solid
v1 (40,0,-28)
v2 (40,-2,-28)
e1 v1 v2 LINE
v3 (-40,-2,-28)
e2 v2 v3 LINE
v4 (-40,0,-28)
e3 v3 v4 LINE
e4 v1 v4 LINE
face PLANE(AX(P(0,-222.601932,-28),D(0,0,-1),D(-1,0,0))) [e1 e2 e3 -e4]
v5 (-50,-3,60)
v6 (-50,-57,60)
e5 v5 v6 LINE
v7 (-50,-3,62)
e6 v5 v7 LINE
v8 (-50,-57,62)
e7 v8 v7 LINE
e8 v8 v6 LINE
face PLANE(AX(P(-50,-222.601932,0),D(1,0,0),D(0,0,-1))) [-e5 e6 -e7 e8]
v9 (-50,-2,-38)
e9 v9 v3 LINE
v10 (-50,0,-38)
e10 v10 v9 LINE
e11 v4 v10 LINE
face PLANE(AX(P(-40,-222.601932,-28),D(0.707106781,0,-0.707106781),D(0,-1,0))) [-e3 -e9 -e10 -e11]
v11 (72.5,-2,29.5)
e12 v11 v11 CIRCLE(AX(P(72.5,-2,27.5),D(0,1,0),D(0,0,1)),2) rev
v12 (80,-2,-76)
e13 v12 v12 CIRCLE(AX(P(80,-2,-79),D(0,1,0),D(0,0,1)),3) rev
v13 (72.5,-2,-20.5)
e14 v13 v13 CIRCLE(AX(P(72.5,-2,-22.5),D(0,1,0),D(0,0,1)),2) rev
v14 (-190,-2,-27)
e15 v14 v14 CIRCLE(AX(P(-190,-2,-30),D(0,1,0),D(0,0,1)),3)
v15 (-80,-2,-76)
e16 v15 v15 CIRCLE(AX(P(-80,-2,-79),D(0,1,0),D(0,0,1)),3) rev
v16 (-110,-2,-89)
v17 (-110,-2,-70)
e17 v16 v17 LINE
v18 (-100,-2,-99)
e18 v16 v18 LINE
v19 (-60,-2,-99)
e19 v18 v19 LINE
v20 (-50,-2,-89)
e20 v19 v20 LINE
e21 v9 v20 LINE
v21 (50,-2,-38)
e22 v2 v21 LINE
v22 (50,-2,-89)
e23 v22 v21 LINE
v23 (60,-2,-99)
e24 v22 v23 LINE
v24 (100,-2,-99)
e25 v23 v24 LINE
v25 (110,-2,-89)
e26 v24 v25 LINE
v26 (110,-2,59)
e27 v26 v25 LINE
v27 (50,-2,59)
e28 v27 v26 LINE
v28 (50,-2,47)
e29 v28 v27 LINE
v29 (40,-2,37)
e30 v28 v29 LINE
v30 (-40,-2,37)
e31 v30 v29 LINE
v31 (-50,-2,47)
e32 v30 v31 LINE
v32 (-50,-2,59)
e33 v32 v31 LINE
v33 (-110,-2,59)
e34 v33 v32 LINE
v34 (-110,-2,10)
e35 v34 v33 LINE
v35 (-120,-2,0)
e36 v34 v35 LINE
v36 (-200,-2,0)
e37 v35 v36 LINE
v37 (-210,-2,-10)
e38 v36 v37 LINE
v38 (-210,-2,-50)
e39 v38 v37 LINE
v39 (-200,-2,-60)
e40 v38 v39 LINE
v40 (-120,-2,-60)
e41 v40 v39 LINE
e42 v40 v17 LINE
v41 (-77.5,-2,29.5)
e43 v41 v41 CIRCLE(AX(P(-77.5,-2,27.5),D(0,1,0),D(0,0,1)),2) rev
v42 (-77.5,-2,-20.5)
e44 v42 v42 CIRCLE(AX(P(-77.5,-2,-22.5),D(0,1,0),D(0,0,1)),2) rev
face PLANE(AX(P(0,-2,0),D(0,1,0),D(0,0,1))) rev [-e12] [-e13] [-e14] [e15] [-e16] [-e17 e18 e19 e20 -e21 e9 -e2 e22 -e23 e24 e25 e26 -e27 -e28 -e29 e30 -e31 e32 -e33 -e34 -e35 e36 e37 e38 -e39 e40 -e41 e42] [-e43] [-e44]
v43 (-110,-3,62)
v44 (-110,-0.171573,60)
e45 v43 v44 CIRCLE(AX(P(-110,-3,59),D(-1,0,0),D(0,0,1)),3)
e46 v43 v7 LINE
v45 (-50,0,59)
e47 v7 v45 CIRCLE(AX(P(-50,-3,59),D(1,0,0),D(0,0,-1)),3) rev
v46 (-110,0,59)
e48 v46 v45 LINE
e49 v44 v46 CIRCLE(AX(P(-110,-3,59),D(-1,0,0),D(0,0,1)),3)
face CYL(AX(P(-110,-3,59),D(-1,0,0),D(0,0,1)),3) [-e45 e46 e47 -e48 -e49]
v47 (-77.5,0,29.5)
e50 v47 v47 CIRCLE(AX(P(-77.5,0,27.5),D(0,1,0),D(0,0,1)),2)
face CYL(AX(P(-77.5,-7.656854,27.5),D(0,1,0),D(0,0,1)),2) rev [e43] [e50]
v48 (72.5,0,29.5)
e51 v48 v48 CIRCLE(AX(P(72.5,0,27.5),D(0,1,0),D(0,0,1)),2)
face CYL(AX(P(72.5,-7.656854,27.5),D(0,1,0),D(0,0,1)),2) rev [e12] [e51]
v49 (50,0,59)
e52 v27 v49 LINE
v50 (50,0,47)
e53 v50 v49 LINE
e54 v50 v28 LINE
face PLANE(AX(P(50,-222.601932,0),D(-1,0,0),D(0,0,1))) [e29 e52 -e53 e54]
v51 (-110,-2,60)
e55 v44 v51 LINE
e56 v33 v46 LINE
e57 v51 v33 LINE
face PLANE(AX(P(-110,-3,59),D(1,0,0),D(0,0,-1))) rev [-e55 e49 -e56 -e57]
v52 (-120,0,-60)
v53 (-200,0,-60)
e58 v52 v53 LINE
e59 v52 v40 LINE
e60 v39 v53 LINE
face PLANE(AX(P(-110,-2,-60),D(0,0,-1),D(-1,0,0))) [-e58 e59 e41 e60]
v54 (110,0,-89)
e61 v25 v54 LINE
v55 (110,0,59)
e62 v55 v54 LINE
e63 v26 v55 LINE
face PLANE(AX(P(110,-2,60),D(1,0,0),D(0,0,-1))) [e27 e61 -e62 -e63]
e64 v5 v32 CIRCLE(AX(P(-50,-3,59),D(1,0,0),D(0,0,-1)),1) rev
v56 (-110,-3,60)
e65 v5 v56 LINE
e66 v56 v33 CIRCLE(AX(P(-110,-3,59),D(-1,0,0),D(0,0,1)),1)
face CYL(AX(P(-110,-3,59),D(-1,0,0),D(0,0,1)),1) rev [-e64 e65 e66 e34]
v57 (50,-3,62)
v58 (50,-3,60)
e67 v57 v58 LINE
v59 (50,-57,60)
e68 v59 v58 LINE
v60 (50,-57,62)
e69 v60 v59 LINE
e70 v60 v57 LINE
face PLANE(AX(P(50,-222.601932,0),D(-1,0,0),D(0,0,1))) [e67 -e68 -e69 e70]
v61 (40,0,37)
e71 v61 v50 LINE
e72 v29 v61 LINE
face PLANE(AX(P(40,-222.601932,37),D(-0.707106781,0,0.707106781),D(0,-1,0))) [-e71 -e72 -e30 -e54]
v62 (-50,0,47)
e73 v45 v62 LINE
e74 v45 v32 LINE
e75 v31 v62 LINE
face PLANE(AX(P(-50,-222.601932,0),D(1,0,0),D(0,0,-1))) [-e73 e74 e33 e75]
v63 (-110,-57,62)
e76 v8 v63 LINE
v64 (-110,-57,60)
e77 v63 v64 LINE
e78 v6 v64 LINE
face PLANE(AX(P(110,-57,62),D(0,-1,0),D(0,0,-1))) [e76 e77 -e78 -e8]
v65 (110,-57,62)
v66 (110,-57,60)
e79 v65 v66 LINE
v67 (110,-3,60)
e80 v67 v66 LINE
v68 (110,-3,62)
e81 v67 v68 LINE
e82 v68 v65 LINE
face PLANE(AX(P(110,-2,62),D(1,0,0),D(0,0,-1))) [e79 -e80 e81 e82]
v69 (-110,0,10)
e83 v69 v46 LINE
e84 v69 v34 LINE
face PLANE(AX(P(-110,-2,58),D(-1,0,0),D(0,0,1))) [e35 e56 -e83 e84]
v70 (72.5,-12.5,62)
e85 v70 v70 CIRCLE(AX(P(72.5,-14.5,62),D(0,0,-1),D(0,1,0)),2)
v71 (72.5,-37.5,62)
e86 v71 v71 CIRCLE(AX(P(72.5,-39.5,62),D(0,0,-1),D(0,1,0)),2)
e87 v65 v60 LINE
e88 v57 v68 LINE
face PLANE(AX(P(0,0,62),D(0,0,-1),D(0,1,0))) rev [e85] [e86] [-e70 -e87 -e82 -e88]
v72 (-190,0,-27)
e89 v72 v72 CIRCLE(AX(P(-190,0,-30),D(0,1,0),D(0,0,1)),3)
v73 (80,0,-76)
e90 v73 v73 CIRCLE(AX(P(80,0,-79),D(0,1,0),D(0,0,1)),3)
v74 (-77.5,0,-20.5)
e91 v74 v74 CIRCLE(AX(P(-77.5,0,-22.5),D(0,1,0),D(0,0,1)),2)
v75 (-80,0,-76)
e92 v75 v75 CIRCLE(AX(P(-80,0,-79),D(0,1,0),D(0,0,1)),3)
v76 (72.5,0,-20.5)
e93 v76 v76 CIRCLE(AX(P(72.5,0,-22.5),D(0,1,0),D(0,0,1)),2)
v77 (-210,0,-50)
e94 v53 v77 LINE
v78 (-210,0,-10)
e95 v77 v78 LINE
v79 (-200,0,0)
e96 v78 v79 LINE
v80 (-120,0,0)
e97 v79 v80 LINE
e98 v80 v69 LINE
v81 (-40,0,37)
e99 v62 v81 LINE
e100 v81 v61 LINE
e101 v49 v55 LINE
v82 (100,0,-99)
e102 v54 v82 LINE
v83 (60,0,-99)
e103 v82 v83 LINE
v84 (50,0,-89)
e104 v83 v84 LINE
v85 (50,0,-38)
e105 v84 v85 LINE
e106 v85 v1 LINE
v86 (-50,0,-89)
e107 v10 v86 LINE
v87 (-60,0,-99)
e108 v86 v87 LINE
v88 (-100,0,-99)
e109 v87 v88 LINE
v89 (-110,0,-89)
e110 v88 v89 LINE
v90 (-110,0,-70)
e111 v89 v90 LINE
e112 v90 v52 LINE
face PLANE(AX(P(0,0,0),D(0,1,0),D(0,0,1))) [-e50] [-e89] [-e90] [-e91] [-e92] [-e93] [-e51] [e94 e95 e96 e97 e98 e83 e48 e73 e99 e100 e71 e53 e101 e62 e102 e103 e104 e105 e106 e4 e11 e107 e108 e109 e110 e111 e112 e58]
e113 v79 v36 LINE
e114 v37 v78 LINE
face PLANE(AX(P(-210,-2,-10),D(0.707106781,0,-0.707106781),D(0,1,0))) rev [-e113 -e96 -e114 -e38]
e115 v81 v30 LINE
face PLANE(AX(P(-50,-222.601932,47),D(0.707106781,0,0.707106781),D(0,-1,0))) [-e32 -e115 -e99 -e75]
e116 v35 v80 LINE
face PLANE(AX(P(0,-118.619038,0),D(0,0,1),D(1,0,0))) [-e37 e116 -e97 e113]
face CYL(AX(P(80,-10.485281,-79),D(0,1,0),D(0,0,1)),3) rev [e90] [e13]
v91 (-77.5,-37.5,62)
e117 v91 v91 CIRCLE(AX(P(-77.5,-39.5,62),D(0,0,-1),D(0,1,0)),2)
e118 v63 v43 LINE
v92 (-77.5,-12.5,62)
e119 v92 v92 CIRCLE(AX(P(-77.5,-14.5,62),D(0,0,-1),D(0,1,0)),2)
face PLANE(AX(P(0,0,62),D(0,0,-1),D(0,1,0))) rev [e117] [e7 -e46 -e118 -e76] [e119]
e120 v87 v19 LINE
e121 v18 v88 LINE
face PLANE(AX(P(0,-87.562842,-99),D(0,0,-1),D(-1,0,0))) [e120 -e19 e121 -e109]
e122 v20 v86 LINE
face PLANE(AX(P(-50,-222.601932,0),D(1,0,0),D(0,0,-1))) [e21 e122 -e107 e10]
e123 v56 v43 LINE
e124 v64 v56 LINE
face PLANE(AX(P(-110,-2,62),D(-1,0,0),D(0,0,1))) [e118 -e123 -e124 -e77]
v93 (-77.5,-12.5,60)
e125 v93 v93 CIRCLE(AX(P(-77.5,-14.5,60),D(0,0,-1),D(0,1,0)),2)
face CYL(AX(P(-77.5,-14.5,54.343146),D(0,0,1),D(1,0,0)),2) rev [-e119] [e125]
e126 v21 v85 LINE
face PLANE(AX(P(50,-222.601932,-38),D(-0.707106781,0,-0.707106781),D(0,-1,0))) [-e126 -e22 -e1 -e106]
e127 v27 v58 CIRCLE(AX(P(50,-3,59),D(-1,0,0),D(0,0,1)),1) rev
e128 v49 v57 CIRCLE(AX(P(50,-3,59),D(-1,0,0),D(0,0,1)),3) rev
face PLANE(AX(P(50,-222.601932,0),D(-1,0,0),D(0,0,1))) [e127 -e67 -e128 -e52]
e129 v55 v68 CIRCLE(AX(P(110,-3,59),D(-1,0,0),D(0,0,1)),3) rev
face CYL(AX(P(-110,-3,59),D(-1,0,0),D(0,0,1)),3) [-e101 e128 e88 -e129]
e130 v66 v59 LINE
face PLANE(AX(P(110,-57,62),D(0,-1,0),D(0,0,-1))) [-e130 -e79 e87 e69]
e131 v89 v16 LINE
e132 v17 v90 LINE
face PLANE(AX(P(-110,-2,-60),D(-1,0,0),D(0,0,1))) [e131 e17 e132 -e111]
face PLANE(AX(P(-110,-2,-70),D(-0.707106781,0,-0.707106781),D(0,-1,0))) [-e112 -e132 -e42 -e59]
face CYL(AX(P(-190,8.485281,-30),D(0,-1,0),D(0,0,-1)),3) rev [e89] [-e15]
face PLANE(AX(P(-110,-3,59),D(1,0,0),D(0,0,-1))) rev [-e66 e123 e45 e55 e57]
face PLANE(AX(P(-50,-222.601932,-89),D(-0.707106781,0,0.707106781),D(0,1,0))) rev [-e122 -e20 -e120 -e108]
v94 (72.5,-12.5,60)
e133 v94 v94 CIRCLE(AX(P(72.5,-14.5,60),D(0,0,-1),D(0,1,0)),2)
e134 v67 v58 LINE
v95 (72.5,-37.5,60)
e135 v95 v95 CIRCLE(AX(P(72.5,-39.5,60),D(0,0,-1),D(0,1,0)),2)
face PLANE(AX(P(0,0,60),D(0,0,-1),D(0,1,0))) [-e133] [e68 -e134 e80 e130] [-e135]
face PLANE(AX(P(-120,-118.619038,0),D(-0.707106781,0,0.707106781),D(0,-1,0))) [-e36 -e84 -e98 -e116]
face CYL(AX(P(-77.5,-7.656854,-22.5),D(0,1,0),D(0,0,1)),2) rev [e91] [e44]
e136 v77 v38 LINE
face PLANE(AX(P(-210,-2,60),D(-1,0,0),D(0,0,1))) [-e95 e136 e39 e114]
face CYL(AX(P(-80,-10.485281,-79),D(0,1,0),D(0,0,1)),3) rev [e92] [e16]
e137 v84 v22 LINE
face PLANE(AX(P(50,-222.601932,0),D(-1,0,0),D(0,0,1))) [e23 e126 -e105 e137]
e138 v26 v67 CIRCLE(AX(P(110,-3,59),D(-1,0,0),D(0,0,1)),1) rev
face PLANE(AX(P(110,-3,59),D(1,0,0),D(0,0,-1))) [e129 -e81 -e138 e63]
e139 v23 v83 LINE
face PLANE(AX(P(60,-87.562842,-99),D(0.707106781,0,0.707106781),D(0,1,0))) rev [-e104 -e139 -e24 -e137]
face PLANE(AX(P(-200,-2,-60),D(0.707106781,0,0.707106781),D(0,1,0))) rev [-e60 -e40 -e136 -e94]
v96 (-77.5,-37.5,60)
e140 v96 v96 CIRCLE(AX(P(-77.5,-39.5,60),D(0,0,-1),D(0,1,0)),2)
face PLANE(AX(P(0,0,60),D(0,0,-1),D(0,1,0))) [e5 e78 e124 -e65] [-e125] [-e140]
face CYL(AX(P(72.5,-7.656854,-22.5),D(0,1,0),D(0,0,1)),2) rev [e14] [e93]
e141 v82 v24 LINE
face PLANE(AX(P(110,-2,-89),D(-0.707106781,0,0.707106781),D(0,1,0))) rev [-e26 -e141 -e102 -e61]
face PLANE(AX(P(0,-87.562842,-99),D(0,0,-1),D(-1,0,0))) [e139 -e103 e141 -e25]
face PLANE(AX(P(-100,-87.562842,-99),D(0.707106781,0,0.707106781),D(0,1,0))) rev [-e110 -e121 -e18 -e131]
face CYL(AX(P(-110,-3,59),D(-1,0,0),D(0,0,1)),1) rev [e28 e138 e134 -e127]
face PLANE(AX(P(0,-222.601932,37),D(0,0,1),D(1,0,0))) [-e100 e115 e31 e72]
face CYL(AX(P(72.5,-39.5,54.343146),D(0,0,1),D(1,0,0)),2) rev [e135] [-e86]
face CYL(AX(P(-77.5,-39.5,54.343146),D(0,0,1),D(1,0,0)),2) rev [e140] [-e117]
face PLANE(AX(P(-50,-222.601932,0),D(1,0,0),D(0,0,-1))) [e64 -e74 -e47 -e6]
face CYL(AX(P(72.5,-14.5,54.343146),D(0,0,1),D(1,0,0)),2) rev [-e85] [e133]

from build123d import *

# Parameters (mm, degrees)
SM_BASE_FLANGE_1_DEPTH            = 2
SM_EDGE_FLANGE_2_STRIP_W          = 10
SM_EDGE_FLANGE_2_STRIP_H          = 2
SM_EDGE_FLANGE_2_STRIP_CUT_DEPTH  = 220
SM_EDGE_FLANGE_2_RELIEF_W         = 11
SM_EDGE_FLANGE_2_RELIEF_H         = 1
SM_EDGE_FLANGE_2_RELIEF_CUT_DEPTH = 2
SM_EDGE_FLANGE_2_DEPTH            = 220
CUT_EXTRUDE_START                 = 62
SKETCH_12_R                       = 2
CUT_EXTRUDE_4_DEPTH               = 2
SKETCH_14_R                       = 2
CUT_EXTRUDE_2_DEPTH               = 2
SKETCH_15_W                       = 100
SKETCH_15_H                       = 25
CUT_EXTRUDE_3_DEPTH               = 57
SKETCH_16_W                       = 100
SKETCH_16_H                       = 60
CUT_EXTRUDE_6_DEPTH               = 2
CUT_EXTRUDE_START_2               = -2
SKETCH_18_R                       = 3
CUT_EXTRUDE_7_DEPTH               = 2
OTHER_START                       = -2
OTHER_2_DEPTH                     = 2
SKETCH_20_W                       = 60
SKETCH_20_H                       = 61
CUT_EXTRUDE_8_DEPTH               = 2
SKETCH_21_R                       = 3
CUT_EXTRUDE_9_DEPTH               = 2
OTHER_4_DEPTH                     = 2
OTHER_4_2_DEPTH                   = 2


# Read off the part's stored shape, not the designer's step: 断开-边角2, 断开-边角4
# Sheet-metal steps are written as plain solids
with BuildPart() as part:
    # Sketch 1 → 基体-法兰1 (new body)
    with BuildSketch(Plane(origin=(0, 0, 0), x_dir=(1, 0, 0), z_dir=(0, 1, 0))):
        Polygon((-110, -60), (110, -60), (110, 60), (110, 160), (-110, 160), (-110, 60), (-210, 60), (-210, -60), align=None)
    extrude(amount=-SM_BASE_FLANGE_1_DEPTH)

    # 边线-法兰2 strip (across the edge) → 边线-法兰2 strip cut (cut)
    with BuildSketch(Plane(origin=(110, -2, 60), x_dir=(0, 0, -1), z_dir=(-1, 0, 0))):
        with Locations((-4, -1)):
            Rectangle(SM_EDGE_FLANGE_2_STRIP_W, SM_EDGE_FLANGE_2_STRIP_H)
    extrude(amount=SM_EDGE_FLANGE_2_STRIP_CUT_DEPTH, mode=Mode.SUBTRACT)

    # 边线-法兰2 relief (on the sheet) → 边线-法兰2 relief cut (cut)
    with BuildSketch(Plane(origin=(110, -2, 59), x_dir=(0, 0, -1), z_dir=(0, -1, 0))):
        with Locations((-4.5, -220.5)):
            Rectangle(SM_EDGE_FLANGE_2_RELIEF_W, SM_EDGE_FLANGE_2_RELIEF_H)
    extrude(amount=-SM_EDGE_FLANGE_2_RELIEF_CUT_DEPTH, mode=Mode.SUBTRACT)

    # 边线-法兰2 section (across the edge) → 边线-法兰2 (add)
    with BuildSketch(Plane(origin=(110, -2, 60), x_dir=(0, 0, -1), z_dir=(-1, 0, 0))):
        with BuildLine():
            Line((-2, 1), (-2, 55))
            Line((-2, 55), (0, 55))
            Line((0, 55), (0, 1))
            ThreePointArc((0, 1), (0.292893219, 0.292893219), (1, 0))
            Line((1, 0), (1, -2))
            ThreePointArc((1, -2), (-1.121320344, -1.121320344), (-2, 1))
        make_face()
    extrude(amount=SM_EDGE_FLANGE_2_DEPTH)

    # 草图12 → 切除-拉伸4 (cut)
    with BuildSketch(Plane.XY.offset(CUT_EXTRUDE_START)):
        with Locations(Location((72.5, -14.5, 0), (0, 0, 90))):
            Circle(SKETCH_12_R)
        with Locations(Location((-77.5, -14.5, 0), (0, 0, 90))):
            Circle(SKETCH_12_R)
        with Locations(Location((-77.5, -39.5, 0), (0, 0, 90))):
            Circle(SKETCH_12_R)
        with Locations(Location((72.5, -39.5, 0), (0, 0, 90))):
            Circle(SKETCH_12_R)
    extrude(amount=-CUT_EXTRUDE_4_DEPTH, mode=Mode.SUBTRACT)

    # 草图14 → 切除-拉伸2 (cut)
    with BuildSketch(Plane(origin=(0, 0, 0), x_dir=(1, 0, 0), z_dir=(0, 1, 0))):
        with Locations(Location((-77.5, 22.5, 0), (0, 0, 270))):
            Circle(SKETCH_14_R)
        with Locations(Location((-77.5, -27.5, 0), (0, 0, 270))):
            Circle(SKETCH_14_R)
        with Locations(Location((72.5, 22.5, 0), (0, 0, 270))):
            Circle(SKETCH_14_R)
        with Locations(Location((72.5, -27.5, 0), (0, 0, 270))):
            Circle(SKETCH_14_R)
    extrude(amount=-CUT_EXTRUDE_2_DEPTH, mode=Mode.SUBTRACT)

    # 草图15 → 切除-拉伸3 (cut)
    with BuildSketch(Plane(origin=(0, 0, 0), x_dir=(1, 0, 0), z_dir=(0, 1, 0))):
        with Locations((0, -49.5)):
            Rectangle(SKETCH_15_W, SKETCH_15_H)
        Polygon((-50, 53), (-50, 28), (50, 28), (50, 53), (50, 160), (-50, 160), align=None)
    extrude(amount=-CUT_EXTRUDE_3_DEPTH, mode=Mode.SUBTRACT)

    # 草图16 → 切除-拉伸6 (cut)
    with BuildSketch(Plane(origin=(0, 0, 0), x_dir=(1, 0, 0), z_dir=(0, 1, 0))):
        with Locations((-160, -30)):
            Rectangle(SKETCH_16_W, SKETCH_16_H)
    extrude(amount=-CUT_EXTRUDE_6_DEPTH, mode=Mode.SUBTRACT)

    # 草图18 → 切除-拉伸7 (cut)
    with BuildSketch(Plane(origin=(0, 0, 0), x_dir=(1, 0, 0), z_dir=(0, 1, 0)).offset(CUT_EXTRUDE_START_2)):
        with Locations(Location((-80, 140, 0), (0, 0, 270))):
            Circle(SKETCH_18_R)
        with Locations(Location((80, 140, 0), (0, 0, 270))):
            Circle(SKETCH_18_R)
        with Locations(Location((-190, 30, 0), (0, 0, 270))):
            Circle(SKETCH_18_R)
    extrude(amount=CUT_EXTRUDE_7_DEPTH, mode=Mode.SUBTRACT)

    # Other 2 outline → Other 2 (add)
    with BuildSketch(Plane(origin=(0, 0, 0), x_dir=(1, 0, 0), z_dir=(0, 1, 0)).offset(OTHER_START)):
        Polygon((-50, -37), (-50, -47), (-40, -37), align=None)
        Polygon((50, -37), (40, -37), (50, -47), align=None)
        Polygon((50, 28), (50, 38), (40, 28), align=None)
        Polygon((-50, 28), (-40, 28), (-50, 38), align=None)
    extrude(amount=OTHER_2_DEPTH)

    # 草图20 → 切除-拉伸8 (cut)
    with BuildSketch(Plane(origin=(0, 0, 0), x_dir=(1, 0, 0), z_dir=(0, 1, 0))):
        with Locations((-80, 129.5)):
            Rectangle(SKETCH_20_W, SKETCH_20_H)
        with Locations((80, 129.5)):
            Rectangle(SKETCH_20_W, SKETCH_20_H)
    extrude(amount=-CUT_EXTRUDE_8_DEPTH, mode=Mode.SUBTRACT)

    # 草图21 → 切除-拉伸9 (cut)
    with BuildSketch(Plane(origin=(0, 0, 0), x_dir=(1, 0, 0), z_dir=(0, 1, 0))):
        with Locations(Location((-80, 79, 0), (0, 0, 270))):
            Circle(SKETCH_21_R)
        with Locations(Location((80, 79, 0), (0, 0, 270))):
            Circle(SKETCH_21_R)
    extrude(amount=-CUT_EXTRUDE_9_DEPTH, mode=Mode.SUBTRACT)

    # Other 4 outline → Other 4 (cut)
    with BuildSketch(Plane(origin=(0, 0, 0), x_dir=(1, 0, 0), z_dir=(0, 1, 0)).offset(OTHER_START)):
        Polygon((-50, 99), (-60, 99), (-50, 89), align=None)
        Polygon((-200, 0), (-210, 10), (-210, 0), align=None)
        Polygon((-210, 50), (-200, 60), (-210, 60), align=None)
        Polygon((-110, 89), (-100, 99), (-110, 99), align=None)
        Polygon((50, 99), (50, 89), (60, 99), align=None)
        Polygon((110, 99), (100, 99), (110, 89), align=None)
    extrude(amount=OTHER_4_DEPTH, mode=Mode.SUBTRACT)

    # Other 4 2 outline → Other 4 2 (add)
    with BuildSketch(Plane(origin=(0, 0, 0), x_dir=(1, 0, 0), z_dir=(0, 1, 0)).offset(OTHER_START)):
        Polygon((-110, 0), (-120, 0), (-110, -10), align=None)
        Polygon((-110, 60), (-110, 70), (-120, 60), align=None)
    extrude(amount=OTHER_4_2_DEPTH)


solid = part.part
